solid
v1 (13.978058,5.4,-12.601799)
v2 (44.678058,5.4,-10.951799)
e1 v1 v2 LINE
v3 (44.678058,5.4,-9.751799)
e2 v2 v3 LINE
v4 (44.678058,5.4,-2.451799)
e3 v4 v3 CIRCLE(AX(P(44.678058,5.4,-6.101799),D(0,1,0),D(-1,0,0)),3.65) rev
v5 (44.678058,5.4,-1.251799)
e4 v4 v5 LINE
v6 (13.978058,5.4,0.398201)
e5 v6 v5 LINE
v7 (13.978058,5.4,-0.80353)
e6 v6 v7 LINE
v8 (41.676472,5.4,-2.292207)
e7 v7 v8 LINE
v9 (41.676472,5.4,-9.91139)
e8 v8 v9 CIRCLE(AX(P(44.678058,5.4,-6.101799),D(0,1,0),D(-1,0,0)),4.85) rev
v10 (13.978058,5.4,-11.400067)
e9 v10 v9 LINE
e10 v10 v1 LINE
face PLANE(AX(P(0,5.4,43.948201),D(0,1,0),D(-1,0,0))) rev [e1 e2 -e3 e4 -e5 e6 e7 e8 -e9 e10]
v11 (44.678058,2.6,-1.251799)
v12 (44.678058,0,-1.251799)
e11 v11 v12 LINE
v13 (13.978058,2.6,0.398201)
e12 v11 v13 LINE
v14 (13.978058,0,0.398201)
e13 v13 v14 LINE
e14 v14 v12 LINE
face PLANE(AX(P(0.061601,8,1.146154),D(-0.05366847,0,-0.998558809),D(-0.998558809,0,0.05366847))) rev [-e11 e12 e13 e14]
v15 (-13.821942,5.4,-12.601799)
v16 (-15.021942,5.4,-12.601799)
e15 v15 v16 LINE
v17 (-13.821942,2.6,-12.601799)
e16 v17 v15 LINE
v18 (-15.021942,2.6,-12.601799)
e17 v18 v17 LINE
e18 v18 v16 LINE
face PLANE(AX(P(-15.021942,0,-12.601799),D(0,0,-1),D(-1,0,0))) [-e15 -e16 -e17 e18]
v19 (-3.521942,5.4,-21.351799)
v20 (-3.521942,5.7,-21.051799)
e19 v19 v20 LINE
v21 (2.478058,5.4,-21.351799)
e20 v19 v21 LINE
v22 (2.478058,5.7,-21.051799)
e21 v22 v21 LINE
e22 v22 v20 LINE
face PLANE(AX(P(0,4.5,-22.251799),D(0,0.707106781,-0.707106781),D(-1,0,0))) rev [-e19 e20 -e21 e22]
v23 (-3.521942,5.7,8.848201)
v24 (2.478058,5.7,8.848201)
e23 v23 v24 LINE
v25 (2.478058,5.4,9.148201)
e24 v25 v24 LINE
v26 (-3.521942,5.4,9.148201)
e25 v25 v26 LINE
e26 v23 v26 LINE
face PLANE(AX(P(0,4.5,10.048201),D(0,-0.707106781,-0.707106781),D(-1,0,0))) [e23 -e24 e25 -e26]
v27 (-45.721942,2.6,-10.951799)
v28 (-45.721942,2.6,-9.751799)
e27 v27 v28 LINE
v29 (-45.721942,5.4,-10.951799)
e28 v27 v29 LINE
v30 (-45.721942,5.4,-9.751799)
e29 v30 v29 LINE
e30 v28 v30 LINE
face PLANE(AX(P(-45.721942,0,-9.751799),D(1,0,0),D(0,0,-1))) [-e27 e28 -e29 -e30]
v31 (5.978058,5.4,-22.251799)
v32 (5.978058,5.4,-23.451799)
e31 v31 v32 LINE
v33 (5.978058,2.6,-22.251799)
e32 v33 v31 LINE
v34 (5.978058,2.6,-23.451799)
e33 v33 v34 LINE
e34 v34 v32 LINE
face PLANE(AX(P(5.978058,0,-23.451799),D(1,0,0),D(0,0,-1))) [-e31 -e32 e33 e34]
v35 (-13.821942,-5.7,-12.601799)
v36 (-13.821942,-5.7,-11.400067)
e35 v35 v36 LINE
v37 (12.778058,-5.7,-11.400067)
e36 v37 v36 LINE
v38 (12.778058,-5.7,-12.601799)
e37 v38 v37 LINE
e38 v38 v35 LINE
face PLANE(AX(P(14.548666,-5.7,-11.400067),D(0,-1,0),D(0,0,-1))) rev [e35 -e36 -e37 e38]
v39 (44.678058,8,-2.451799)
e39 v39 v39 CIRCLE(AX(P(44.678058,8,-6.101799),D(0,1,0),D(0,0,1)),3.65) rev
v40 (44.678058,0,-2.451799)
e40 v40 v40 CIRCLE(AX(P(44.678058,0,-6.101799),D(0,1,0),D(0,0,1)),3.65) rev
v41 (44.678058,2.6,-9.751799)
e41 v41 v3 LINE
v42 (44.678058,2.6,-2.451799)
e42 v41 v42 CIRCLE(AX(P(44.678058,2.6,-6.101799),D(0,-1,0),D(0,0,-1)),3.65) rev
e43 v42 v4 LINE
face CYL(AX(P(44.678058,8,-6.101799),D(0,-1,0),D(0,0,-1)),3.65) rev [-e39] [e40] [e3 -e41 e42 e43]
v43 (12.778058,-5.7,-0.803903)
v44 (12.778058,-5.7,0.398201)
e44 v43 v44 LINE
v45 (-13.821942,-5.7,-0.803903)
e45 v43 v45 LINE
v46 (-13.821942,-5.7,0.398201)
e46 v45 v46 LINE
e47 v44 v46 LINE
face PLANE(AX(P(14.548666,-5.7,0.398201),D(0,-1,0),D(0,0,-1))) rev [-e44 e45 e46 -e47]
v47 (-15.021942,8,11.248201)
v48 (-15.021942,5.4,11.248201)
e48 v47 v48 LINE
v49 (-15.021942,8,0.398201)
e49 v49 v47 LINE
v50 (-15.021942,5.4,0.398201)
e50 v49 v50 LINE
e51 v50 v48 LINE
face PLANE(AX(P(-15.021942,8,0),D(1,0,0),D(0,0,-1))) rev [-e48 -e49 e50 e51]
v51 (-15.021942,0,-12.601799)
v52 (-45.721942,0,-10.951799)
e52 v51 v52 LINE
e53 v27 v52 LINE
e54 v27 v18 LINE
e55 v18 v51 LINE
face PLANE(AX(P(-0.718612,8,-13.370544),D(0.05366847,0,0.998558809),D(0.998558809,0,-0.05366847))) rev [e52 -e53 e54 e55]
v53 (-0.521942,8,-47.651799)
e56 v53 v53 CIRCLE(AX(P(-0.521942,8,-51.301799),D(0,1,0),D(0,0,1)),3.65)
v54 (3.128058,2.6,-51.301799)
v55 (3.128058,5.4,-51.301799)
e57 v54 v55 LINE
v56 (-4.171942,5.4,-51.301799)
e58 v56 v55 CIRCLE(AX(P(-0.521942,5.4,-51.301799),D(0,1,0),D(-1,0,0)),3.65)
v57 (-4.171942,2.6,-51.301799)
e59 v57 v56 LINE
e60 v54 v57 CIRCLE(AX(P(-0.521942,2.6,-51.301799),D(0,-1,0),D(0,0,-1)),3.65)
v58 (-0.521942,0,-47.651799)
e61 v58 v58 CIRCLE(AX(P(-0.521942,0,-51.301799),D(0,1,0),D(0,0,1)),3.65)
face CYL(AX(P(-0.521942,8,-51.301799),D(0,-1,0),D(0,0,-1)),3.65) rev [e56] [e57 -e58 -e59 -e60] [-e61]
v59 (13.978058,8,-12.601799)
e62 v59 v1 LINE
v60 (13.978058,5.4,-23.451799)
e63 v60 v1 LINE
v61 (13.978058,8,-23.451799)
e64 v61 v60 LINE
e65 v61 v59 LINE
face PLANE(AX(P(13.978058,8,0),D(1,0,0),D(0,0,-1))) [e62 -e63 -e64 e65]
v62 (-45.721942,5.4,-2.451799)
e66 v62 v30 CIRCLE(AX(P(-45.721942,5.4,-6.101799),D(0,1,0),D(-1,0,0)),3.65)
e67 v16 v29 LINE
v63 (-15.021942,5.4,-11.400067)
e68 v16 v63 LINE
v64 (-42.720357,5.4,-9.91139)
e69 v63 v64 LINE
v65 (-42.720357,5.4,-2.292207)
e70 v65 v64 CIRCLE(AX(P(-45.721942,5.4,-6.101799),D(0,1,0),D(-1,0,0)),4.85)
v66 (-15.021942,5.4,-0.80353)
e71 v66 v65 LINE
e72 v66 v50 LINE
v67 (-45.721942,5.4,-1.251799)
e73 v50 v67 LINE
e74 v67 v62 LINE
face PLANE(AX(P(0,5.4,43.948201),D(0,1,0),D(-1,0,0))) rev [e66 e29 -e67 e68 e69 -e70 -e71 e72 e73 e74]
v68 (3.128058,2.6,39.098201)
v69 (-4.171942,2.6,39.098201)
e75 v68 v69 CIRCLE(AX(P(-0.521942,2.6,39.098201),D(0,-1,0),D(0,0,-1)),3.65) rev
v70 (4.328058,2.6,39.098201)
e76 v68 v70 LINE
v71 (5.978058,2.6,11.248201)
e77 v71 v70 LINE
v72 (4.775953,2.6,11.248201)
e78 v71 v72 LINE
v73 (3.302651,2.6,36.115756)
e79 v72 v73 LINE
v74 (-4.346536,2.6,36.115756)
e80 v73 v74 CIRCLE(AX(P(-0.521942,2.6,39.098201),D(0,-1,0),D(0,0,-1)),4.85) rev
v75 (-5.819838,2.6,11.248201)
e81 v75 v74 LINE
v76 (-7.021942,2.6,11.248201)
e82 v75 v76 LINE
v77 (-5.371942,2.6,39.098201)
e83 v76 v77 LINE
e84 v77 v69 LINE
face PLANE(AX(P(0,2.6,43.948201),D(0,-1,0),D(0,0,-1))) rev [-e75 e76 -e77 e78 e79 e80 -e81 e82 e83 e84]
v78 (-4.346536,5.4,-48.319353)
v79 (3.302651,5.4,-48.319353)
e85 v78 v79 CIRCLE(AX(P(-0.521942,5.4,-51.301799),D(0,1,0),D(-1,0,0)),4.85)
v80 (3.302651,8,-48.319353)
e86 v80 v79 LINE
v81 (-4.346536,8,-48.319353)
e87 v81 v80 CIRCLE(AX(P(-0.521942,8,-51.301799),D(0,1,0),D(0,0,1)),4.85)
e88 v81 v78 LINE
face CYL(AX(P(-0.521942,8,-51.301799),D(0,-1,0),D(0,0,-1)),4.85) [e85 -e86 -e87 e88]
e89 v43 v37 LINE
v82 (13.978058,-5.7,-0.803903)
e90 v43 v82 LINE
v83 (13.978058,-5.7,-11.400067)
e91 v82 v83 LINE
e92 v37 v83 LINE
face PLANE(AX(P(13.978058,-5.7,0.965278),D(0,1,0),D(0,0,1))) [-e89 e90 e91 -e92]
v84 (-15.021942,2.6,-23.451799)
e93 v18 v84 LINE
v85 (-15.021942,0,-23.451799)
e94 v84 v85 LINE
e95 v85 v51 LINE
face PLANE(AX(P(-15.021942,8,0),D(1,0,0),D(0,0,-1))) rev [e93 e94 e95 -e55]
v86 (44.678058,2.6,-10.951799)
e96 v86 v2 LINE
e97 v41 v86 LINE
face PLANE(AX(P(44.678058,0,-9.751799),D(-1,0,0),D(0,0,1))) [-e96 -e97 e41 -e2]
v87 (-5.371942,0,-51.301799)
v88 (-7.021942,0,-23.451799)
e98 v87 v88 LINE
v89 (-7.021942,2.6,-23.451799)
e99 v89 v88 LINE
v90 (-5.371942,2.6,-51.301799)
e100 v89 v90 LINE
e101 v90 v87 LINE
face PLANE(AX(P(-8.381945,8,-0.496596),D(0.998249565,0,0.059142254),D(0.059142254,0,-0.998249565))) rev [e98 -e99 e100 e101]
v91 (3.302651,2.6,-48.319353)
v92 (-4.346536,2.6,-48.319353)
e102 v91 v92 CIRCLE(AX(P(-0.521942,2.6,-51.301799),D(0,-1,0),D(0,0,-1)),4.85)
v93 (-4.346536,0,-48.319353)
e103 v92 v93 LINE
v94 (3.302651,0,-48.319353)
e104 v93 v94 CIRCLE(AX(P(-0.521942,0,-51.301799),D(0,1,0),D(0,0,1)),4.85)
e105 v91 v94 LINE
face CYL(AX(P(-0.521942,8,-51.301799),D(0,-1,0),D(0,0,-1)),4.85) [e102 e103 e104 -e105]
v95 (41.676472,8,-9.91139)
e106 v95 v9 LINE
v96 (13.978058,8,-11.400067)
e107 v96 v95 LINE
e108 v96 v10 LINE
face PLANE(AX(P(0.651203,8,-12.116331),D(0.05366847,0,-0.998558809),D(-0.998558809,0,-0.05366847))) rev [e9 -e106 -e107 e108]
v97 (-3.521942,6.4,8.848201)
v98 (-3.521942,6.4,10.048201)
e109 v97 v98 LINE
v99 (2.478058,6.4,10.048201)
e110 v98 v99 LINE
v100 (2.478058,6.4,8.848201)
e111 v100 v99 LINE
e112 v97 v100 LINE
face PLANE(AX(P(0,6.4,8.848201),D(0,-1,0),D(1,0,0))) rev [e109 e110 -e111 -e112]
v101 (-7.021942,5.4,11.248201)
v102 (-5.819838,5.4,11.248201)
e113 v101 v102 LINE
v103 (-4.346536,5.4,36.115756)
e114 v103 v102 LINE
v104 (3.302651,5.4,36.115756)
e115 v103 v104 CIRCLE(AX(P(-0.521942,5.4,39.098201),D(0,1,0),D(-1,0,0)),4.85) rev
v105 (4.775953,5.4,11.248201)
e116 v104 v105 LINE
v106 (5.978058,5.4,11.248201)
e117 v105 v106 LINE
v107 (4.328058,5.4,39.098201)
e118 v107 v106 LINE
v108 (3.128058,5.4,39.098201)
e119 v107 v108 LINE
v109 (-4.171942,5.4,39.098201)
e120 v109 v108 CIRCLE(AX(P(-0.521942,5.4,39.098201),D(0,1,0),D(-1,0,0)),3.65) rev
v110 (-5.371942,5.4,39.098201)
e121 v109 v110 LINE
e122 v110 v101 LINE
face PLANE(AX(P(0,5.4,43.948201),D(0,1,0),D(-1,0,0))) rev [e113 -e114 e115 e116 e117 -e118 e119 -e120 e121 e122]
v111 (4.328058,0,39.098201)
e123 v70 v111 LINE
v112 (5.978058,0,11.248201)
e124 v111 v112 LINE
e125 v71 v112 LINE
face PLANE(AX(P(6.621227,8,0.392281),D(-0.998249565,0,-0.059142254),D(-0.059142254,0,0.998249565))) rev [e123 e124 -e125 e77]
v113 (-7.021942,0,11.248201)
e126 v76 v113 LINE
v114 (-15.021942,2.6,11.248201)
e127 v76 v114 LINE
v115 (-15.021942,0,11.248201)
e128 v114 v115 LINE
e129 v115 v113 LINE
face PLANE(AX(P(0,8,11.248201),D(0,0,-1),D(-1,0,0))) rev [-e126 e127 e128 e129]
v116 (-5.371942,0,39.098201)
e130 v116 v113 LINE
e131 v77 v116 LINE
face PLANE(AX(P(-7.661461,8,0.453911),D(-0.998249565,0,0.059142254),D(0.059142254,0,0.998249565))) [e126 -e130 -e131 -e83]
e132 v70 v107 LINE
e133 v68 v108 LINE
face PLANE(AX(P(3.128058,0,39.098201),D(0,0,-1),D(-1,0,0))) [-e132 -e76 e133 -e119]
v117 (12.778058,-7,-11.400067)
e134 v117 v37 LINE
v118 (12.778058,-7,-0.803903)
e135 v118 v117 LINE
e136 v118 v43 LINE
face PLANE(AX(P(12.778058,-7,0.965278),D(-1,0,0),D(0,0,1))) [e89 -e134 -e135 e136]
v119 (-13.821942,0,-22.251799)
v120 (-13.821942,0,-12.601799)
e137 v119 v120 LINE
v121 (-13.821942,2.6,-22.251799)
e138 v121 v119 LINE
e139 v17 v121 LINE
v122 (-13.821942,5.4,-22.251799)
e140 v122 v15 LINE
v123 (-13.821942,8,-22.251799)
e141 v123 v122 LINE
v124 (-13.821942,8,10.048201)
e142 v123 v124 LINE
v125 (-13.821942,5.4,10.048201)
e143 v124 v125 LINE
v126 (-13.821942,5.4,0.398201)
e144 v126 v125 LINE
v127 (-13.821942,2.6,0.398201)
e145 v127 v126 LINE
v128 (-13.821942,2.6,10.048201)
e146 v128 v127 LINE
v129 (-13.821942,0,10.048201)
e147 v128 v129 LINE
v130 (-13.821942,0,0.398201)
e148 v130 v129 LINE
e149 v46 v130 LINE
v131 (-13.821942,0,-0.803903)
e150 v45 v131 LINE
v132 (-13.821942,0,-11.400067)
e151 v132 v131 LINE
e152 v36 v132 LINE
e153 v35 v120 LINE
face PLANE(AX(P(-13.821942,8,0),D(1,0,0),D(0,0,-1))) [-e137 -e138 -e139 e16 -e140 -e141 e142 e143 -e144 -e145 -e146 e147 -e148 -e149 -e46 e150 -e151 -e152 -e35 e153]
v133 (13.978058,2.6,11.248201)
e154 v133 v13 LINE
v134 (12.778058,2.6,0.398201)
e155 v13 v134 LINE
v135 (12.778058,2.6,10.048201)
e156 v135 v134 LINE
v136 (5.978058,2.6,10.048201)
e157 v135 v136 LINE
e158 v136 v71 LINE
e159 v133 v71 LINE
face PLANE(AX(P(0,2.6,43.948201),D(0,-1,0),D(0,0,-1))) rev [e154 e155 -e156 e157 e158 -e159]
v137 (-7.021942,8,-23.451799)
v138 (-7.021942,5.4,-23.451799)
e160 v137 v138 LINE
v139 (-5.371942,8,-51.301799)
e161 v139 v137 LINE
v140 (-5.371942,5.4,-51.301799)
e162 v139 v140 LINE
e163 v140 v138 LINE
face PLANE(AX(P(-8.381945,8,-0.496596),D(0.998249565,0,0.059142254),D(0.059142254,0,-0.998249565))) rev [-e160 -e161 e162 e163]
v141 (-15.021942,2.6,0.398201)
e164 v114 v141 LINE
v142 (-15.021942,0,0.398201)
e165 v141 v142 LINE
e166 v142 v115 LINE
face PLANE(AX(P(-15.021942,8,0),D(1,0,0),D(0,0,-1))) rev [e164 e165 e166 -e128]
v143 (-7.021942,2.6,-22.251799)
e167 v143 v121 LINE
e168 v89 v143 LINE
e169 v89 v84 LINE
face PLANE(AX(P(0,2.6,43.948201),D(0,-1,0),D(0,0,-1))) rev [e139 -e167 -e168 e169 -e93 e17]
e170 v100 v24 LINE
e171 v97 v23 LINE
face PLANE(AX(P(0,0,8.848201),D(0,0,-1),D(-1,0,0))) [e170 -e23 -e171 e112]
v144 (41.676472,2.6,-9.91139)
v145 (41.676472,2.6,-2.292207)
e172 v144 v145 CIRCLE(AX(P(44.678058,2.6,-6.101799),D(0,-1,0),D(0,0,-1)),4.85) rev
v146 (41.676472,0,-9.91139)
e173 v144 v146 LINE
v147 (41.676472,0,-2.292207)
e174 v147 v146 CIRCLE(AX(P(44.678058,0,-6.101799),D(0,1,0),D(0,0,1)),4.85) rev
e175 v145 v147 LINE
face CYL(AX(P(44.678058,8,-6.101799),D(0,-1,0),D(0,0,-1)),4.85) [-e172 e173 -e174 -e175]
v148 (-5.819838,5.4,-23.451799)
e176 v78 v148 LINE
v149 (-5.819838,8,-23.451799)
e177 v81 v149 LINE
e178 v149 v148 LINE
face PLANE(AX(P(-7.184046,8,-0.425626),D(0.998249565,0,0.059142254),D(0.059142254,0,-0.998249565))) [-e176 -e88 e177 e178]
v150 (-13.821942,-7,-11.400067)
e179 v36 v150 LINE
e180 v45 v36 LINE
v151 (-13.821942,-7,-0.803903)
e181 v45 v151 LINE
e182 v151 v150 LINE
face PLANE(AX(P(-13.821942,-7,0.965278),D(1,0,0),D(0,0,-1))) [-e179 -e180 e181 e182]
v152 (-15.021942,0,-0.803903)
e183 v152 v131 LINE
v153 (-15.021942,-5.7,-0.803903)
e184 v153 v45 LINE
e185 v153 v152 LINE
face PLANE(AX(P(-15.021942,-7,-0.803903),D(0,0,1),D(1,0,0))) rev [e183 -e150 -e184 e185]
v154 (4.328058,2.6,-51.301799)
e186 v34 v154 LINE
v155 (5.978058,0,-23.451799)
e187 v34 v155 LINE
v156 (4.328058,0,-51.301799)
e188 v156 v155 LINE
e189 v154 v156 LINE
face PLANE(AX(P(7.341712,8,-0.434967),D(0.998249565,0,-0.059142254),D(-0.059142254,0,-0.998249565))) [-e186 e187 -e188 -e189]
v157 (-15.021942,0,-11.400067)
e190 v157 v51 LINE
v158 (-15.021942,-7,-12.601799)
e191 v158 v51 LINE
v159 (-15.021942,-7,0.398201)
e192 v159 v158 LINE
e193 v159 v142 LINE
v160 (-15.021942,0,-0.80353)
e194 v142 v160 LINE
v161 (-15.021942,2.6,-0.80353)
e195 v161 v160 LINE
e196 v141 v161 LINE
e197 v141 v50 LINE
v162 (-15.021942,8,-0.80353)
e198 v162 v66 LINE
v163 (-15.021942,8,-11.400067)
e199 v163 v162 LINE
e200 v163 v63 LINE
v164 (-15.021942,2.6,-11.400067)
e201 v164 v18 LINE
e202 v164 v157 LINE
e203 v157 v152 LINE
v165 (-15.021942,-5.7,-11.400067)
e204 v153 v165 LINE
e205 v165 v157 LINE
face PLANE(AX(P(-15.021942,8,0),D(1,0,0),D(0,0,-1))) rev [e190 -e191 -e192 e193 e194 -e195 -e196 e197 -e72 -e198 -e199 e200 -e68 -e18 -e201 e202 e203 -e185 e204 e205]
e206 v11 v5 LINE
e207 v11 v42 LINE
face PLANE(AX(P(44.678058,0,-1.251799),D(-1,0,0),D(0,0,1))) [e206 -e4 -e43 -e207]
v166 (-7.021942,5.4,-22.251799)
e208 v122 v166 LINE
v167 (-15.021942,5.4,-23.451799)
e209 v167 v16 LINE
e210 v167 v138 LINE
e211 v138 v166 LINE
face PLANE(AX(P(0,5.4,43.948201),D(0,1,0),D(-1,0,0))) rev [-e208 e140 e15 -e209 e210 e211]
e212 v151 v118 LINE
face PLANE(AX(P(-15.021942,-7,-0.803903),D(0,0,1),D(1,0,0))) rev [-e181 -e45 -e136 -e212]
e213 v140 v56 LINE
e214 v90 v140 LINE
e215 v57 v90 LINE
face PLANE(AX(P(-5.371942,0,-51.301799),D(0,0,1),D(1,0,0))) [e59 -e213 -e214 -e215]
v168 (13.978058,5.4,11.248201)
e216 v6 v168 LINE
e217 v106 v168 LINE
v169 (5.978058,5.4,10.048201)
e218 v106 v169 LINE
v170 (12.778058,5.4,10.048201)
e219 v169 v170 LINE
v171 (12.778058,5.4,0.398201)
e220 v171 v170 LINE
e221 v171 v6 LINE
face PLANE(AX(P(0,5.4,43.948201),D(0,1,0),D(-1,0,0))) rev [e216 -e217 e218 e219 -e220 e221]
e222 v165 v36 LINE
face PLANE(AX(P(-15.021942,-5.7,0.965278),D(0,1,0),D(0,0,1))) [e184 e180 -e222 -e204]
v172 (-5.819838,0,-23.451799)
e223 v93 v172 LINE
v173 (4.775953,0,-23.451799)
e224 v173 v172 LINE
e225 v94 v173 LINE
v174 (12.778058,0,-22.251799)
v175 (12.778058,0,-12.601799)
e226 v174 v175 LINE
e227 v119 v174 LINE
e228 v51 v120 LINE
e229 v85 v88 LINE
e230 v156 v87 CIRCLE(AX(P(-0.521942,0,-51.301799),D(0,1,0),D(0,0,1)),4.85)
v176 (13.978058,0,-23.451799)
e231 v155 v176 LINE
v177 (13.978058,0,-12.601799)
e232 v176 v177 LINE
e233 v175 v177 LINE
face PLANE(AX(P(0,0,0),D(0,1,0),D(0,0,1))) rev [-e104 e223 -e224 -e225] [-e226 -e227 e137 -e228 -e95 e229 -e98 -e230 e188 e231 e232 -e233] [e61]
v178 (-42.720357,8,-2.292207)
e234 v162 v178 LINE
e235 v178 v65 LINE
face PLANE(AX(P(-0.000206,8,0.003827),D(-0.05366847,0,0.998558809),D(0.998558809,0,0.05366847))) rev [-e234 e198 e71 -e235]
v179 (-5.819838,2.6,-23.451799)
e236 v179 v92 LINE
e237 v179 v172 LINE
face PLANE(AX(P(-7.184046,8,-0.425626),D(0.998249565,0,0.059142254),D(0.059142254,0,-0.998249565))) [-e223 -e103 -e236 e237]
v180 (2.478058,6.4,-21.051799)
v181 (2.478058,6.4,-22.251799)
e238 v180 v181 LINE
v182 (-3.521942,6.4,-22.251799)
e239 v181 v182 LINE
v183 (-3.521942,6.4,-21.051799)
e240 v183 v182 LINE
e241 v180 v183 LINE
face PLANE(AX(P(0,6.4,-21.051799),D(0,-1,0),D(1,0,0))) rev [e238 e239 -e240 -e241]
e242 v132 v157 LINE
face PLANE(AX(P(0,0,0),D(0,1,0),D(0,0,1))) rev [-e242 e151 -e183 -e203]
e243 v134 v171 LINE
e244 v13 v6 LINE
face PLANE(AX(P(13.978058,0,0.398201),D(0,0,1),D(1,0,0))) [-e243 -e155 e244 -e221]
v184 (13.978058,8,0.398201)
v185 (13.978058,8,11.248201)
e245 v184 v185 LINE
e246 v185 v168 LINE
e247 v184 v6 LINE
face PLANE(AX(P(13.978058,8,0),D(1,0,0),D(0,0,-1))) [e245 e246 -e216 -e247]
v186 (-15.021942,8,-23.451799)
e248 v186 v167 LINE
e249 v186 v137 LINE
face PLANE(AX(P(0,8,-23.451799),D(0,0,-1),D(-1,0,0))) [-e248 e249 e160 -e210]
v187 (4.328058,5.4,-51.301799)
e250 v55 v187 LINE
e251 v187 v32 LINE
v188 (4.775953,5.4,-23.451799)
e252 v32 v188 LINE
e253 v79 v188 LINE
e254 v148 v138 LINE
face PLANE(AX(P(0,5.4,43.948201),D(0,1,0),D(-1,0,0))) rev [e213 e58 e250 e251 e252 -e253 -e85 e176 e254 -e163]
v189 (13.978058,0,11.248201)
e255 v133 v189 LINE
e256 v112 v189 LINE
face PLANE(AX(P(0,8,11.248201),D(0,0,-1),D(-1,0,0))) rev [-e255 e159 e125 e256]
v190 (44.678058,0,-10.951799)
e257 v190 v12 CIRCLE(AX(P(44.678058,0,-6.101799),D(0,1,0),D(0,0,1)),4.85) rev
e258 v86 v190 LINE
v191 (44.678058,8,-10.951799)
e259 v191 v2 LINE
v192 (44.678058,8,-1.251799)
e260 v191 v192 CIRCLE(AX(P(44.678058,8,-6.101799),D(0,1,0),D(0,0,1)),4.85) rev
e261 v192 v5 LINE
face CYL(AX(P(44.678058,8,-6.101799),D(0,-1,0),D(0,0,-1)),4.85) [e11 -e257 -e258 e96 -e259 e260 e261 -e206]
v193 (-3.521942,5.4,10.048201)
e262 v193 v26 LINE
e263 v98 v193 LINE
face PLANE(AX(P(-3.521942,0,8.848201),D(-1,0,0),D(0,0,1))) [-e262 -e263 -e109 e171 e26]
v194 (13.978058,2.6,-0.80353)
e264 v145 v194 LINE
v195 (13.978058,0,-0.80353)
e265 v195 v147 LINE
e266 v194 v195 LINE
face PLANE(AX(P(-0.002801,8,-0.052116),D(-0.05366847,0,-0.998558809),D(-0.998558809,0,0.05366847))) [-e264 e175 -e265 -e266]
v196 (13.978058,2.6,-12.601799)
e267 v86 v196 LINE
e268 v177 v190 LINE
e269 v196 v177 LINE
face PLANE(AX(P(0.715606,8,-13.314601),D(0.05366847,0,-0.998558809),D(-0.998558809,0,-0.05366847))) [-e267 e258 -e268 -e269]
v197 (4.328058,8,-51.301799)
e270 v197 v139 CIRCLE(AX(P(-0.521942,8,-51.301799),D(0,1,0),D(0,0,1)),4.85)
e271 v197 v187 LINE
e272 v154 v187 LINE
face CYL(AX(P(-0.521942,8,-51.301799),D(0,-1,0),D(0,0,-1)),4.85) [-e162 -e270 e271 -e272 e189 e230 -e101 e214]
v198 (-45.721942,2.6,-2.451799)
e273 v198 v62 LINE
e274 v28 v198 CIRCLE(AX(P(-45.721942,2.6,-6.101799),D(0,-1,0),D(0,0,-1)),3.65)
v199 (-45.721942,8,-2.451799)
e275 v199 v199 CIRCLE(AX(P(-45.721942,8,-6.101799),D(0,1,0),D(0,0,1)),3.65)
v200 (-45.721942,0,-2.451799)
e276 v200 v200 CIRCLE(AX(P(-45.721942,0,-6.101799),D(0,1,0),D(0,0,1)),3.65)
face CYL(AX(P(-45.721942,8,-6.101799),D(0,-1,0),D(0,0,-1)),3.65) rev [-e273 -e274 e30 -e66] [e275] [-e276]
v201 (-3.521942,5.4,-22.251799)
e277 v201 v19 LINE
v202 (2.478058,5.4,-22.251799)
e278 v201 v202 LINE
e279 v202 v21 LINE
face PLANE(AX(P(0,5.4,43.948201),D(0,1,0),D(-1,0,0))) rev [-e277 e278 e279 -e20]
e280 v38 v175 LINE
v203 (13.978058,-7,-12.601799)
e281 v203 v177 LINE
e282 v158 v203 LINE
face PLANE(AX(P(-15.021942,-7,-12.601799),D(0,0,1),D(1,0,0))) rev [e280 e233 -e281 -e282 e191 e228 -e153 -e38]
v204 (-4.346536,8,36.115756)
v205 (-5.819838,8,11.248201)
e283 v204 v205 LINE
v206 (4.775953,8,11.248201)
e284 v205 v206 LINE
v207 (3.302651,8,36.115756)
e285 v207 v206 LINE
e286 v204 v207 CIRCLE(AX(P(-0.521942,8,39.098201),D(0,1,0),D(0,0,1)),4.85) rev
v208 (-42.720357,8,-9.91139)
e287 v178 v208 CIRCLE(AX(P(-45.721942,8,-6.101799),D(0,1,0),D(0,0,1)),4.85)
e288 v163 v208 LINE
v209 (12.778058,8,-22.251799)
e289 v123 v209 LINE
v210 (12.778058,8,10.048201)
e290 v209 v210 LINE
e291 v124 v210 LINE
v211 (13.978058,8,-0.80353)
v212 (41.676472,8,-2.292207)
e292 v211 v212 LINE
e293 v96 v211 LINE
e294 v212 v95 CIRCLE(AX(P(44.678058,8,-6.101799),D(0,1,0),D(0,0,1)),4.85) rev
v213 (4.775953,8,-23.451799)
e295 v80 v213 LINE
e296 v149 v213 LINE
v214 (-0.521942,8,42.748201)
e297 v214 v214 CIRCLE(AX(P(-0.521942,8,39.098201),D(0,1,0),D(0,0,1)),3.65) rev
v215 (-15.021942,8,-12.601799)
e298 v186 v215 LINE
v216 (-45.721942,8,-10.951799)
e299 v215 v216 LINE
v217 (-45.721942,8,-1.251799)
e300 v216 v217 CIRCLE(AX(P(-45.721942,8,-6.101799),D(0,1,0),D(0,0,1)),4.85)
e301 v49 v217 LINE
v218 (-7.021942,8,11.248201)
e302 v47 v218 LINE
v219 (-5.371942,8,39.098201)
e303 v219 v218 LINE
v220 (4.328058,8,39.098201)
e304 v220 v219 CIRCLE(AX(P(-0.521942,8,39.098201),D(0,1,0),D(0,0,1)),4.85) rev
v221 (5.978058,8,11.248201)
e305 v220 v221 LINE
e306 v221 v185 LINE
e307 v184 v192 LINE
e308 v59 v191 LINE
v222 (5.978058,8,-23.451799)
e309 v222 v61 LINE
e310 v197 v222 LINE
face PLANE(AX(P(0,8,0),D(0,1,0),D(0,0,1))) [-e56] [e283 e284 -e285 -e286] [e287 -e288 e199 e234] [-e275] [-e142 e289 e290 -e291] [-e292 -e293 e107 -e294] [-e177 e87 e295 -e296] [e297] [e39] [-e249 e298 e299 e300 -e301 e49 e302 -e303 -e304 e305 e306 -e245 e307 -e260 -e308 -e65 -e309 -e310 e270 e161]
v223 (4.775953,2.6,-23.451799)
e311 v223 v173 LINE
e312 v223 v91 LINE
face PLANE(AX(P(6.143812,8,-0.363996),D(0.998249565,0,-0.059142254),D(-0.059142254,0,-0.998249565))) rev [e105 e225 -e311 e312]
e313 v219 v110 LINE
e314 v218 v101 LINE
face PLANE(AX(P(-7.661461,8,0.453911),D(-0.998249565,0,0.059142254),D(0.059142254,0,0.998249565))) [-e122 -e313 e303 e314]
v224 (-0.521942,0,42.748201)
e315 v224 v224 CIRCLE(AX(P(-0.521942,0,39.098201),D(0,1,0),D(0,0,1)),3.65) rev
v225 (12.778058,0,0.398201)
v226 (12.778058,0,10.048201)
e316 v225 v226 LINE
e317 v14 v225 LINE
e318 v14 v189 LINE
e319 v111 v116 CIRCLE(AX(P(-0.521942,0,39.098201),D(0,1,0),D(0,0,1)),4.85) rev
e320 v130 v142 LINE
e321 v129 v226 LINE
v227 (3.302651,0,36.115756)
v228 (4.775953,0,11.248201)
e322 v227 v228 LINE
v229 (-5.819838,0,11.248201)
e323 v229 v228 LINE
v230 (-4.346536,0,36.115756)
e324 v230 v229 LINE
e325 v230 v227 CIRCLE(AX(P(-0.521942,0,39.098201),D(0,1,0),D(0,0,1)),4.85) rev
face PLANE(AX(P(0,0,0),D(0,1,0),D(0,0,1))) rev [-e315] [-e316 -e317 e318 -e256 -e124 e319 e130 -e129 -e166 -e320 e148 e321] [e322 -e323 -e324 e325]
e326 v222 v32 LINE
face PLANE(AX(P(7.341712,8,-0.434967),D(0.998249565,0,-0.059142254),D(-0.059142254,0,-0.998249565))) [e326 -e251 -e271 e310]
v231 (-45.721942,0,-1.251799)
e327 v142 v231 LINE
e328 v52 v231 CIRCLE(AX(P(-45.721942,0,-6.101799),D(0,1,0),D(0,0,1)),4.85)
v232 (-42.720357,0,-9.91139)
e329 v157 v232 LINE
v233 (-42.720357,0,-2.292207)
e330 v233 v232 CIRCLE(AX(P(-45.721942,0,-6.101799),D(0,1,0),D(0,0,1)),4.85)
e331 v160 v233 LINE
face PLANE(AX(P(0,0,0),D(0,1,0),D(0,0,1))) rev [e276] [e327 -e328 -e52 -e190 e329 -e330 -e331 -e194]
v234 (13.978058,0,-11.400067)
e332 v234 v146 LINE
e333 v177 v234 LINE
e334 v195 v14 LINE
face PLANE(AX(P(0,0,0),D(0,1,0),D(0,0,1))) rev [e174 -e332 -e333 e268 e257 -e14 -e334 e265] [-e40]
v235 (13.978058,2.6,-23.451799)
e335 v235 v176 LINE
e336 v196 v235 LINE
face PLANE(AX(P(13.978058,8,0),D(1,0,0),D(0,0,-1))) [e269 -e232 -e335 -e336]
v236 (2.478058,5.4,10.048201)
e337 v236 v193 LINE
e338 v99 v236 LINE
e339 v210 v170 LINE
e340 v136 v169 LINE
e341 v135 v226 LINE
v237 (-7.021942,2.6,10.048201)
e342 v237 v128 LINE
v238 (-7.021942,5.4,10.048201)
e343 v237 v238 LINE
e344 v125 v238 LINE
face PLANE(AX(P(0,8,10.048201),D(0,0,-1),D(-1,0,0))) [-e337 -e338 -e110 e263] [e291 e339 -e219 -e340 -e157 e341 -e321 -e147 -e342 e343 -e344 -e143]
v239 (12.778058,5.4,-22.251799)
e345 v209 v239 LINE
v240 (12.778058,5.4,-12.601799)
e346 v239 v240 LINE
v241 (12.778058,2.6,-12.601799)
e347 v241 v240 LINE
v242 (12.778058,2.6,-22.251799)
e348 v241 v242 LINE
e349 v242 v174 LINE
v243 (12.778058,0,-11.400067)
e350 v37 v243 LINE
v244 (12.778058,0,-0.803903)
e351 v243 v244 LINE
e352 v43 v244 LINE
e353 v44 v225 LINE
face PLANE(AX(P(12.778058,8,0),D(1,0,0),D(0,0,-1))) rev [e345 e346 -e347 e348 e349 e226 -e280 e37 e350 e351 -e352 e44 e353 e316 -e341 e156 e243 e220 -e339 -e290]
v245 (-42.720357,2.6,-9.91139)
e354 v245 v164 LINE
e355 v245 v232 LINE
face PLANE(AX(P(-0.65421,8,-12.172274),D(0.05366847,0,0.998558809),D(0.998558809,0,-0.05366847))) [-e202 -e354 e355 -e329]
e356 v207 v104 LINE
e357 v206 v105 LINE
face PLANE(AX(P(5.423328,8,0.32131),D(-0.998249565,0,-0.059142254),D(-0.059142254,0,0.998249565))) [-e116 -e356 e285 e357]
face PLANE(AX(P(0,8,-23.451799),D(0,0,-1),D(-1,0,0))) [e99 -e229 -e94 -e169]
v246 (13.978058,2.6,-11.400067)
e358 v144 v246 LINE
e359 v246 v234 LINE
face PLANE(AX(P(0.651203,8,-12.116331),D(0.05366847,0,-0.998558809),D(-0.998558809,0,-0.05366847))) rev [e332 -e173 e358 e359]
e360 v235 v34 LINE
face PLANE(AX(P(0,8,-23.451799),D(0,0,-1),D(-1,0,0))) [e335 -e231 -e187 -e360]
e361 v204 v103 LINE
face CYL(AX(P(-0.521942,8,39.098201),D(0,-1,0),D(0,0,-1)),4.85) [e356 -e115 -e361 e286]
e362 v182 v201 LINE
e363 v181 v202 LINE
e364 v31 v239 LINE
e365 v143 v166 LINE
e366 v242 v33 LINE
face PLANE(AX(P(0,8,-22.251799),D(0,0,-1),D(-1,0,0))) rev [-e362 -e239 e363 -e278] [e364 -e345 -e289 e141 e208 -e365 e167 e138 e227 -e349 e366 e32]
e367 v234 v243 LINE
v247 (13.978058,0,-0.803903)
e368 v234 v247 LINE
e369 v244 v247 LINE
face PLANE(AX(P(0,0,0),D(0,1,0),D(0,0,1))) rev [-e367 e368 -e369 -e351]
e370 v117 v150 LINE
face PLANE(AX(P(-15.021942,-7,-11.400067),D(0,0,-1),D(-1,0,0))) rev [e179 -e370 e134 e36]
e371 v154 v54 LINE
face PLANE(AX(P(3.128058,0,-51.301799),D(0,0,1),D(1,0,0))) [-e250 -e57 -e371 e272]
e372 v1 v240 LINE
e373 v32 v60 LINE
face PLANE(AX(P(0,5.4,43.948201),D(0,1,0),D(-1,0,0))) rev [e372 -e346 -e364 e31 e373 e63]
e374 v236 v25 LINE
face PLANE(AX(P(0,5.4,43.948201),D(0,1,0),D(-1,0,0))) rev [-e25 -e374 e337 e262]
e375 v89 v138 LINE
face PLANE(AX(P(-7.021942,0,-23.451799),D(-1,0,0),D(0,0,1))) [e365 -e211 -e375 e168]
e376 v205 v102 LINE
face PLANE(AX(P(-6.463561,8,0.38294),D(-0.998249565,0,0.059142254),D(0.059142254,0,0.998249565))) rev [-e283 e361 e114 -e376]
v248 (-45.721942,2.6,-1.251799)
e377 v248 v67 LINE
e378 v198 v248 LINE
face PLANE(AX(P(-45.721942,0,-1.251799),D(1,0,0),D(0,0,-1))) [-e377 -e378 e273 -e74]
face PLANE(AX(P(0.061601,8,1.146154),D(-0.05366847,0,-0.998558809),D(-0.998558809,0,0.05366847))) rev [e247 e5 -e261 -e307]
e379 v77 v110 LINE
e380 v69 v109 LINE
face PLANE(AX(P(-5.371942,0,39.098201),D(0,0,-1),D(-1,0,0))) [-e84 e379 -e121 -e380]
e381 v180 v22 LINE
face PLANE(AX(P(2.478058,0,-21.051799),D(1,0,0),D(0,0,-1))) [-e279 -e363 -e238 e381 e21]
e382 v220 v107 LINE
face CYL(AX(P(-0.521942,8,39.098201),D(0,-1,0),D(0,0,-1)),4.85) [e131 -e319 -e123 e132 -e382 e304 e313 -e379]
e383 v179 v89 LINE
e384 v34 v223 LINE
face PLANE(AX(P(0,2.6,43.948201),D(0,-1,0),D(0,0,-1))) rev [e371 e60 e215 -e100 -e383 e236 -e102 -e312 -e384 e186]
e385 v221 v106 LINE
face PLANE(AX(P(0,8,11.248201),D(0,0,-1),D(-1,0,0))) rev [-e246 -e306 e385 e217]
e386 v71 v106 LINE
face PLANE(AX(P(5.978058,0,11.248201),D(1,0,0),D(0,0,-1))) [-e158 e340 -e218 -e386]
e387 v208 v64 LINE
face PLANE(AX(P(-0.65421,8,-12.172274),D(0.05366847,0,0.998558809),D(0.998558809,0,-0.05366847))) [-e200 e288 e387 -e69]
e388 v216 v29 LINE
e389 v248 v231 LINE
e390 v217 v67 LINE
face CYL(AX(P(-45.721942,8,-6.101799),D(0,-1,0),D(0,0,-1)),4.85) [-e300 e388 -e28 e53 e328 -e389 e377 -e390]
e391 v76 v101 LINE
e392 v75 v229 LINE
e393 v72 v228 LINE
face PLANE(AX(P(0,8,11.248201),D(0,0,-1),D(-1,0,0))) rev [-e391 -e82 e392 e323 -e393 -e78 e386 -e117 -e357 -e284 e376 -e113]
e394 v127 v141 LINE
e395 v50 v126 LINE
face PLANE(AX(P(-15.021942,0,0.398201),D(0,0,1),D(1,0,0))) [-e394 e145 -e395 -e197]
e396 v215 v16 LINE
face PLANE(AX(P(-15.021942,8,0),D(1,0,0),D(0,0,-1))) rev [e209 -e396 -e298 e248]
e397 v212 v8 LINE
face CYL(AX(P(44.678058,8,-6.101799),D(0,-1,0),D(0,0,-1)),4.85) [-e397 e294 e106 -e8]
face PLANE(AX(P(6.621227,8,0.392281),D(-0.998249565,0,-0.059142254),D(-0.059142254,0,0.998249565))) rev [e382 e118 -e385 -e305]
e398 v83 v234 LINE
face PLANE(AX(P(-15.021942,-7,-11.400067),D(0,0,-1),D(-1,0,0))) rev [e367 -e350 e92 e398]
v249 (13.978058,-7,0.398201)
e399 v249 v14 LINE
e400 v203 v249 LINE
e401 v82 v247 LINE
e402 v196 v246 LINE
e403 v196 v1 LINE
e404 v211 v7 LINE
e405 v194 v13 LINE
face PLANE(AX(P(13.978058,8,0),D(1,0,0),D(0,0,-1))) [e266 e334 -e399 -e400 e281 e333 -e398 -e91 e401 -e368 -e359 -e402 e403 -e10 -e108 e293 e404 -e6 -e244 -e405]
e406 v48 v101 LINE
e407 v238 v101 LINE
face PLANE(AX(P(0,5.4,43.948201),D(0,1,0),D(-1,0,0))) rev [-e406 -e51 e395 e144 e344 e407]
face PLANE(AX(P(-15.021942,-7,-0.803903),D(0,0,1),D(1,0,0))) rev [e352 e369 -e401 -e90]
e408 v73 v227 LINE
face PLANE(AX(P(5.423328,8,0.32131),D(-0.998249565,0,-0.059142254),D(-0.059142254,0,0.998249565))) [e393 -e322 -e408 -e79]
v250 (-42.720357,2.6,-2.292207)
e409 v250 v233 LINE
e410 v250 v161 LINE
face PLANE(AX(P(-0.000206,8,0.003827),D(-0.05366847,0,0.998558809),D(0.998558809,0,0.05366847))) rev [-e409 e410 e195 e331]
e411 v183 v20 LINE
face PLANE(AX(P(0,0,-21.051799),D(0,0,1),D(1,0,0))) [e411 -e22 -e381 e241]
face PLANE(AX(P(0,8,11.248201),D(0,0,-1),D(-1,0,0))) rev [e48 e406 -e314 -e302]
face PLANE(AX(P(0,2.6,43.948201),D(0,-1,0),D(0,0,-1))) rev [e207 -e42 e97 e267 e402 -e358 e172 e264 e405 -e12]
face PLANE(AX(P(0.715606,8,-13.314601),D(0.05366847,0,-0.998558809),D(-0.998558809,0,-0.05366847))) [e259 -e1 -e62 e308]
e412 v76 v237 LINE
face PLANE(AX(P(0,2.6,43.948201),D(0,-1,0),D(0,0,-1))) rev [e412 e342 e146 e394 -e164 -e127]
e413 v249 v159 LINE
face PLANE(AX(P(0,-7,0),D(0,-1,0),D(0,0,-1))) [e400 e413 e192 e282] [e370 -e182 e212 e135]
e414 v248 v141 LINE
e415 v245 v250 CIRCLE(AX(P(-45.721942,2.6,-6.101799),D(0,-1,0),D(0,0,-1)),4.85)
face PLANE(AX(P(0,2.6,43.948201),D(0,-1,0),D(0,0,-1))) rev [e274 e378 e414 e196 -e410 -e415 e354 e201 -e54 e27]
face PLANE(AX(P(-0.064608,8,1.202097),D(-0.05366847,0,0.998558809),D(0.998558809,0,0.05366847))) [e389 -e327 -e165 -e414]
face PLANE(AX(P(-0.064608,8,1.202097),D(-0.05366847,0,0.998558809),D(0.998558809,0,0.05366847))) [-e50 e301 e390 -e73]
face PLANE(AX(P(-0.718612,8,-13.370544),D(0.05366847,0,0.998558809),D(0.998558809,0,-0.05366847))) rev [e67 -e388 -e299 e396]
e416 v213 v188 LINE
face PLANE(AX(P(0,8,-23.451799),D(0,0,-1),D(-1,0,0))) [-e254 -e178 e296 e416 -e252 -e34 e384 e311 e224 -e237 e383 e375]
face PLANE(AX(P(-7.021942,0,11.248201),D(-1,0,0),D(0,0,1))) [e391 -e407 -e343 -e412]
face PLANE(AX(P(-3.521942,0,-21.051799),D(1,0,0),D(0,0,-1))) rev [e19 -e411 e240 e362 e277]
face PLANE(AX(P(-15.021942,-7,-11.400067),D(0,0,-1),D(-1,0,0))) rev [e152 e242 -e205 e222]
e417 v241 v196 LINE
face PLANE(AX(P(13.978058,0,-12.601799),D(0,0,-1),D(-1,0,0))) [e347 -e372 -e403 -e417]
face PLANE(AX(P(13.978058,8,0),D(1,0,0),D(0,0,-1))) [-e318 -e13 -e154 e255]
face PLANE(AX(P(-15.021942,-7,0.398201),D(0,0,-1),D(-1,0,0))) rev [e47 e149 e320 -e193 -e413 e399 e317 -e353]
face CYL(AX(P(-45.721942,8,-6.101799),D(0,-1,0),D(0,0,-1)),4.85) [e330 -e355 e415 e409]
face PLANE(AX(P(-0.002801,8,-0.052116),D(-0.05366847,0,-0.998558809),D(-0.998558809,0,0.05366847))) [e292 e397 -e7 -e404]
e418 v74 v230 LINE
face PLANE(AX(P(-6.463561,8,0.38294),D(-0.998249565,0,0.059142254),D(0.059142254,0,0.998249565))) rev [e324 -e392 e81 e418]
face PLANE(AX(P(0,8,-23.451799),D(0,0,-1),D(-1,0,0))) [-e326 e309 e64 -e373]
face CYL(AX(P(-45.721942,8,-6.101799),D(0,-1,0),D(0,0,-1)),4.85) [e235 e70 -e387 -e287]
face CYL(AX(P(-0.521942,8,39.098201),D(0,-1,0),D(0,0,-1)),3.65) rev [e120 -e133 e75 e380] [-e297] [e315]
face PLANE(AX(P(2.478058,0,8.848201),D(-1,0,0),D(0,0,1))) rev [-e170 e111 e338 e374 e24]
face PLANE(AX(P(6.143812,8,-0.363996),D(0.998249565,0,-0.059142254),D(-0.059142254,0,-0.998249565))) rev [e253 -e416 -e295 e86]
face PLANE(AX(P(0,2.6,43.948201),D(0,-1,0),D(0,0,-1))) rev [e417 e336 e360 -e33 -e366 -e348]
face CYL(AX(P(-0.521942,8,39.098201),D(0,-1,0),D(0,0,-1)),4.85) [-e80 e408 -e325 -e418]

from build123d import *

# Parameters (mm, degrees)
SKETCH1_R               = 3.65
SKETCH1_W               = 26.6
SKETCH1_H               = 32.3
BOSS_EXTRUDE1_DEPTH     = 8
SKETCH2_W               = 3
SKETCH2_H               = 0.7
BOSS_EXTRUDE2_DEPTH     = 1.2
SKETCH3_W               = 3
SKETCH3_H               = 0.7
BOSS_EXTRUDE3_DEPTH     = 1.2
CHAMFER1_SIZE           = 1.2
CUT_EXTRUDE1_DEPTH      = 85.642077968
CUT_EXTRUDE1_DEPTH_BACK = 85.642077968
SKETCH4_W               = 48.801078557
SKETCH4_H               = 1.4
SKETCH4_W_2             = 10.59579159
SKETCH4_W_3             = 46.838011079
BOSS_EXTRUDE4_START     = -5.4
SKETCH5_W               = 13
SKETCH5_H               = 1.2
SKETCH5_W_2             = 1.2
SKETCH5_H_2             = 13
BOSS_EXTRUDE4_DEPTH     = 2.8
BOSS_EXTRUDE5_REACH     = 77.99
SKETCH7_W               = 1.2
SKETCH7_H               = 1.202104206
SKETCH7_H_2             = 1.201731925
BOSS_EXTRUDE6_DEPTH     = 7
SKETCH8_W               = 1.202104206
SKETCH8_H               = 1.3
SKETCH8_W_2             = 1.201731925
BOSS_EXTRUDE7_DEPTH     = 26.6
SKETCH9_W               = 1.2
SKETCH9_H               = 1.3
BOSS_EXTRUDE8_DEPTH     = 11.797895795


with BuildPart() as part:
    # Sketch1 → Boss-Extrude1 (new body)
    with BuildSketch(Plane(origin=(0, 0, 0), x_dir=(1, 0, 0), z_dir=(0, 1, 0))):
        with BuildLine():
            Line((-7.021942446, 23.451798561), (-15.021942446, 23.451798561))
            Line((-15.021942446, 23.451798561), (-15.021942446, 12.601798561))
            Line((-15.021942446, 12.601798561), (-45.721942446, 10.951798561))
            ThreePointArc((-45.721942446, 10.951798561), (-50.571942446, 6.101798561), (-45.721942446, 1.251798561))
            Line((-45.721942446, 1.251798561), (-15.021942446, -0.398201439))
            Line((-15.021942446, -0.398201439), (-15.021942446, -11.248201439))
            Line((-15.021942446, -11.248201439), (-7.021942446, -11.248201439))
            Line((-7.021942446, -11.248201439), (-5.371942446, -39.098201439))
            ThreePointArc((-5.371942446, -39.098201439), (-0.521942446, -43.948201439), (4.328057554, -39.098201439))
            Line((4.328057554, -39.098201439), (5.978057554, -11.248201439))
            Line((5.978057554, -11.248201439), (13.978057554, -11.248201439))
            Line((13.978057554, -11.248201439), (13.978057554, -0.398201439))
            Line((13.978057554, -0.398201439), (44.678057554, 1.251798561))
            ThreePointArc((44.678057554, 1.251798561), (49.528057554, 6.101798561), (44.678057554, 10.951798561))
            Line((44.678057554, 10.951798561), (13.978057554, 12.601798561))
            Line((13.978057554, 12.601798561), (13.978057554, 23.451798561))
            Line((13.978057554, 23.451798561), (5.978057554, 23.451798561))
            Line((5.978057554, 23.451798561), (4.328057554, 51.301798561))
            ThreePointArc((4.328057554, 51.301798561), (-0.521942446, 56.151798561), (-5.371942446, 51.301798561))
            Line((-5.371942446, 51.301798561), (-7.021942446, 23.451798561))
        make_face()
        with Locations(Location((-0.521942446, -39.098201439, 0), (0, 0, 270))):
            Circle(SKETCH1_R, mode=Mode.SUBTRACT)
        with BuildLine():
            Line((4.775953349, -11.248201439), (3.302651218, -36.115755579))
            ThreePointArc((3.302651218, -36.115755579), (-0.521942446, -34.248201439), (-4.34653611, -36.115755579))
            Line((-4.34653611, -36.115755579), (-5.819838241, -11.248201439))
            Line((-5.819838241, -11.248201439), (4.775953349, -11.248201439))
        make_face(mode=Mode.SUBTRACT)
        with Locations(Location((-45.721942446, 6.101798561, 0), (0, 0, 270))):
            Circle(SKETCH1_R, mode=Mode.SUBTRACT)
        with BuildLine():
            Line((-42.720356894, 9.911389638), (-15.021942446, 11.400066636))
            Line((-15.021942446, 11.400066636), (-15.021942446, 0.803530486))
            Line((-15.021942446, 0.803530486), (-42.720356894, 2.292207484))
            ThreePointArc((-42.720356894, 2.292207484), (-40.871942446, 6.101798561), (-42.720356894, 9.911389638))
        make_face(mode=Mode.SUBTRACT)
        with Locations((-0.521942446, 6.101798561)):
            Rectangle(SKETCH1_W, SKETCH1_H, mode=Mode.SUBTRACT)
        with BuildLine():
            Line((-5.819838241, 23.451798561), (-4.34653611, 48.319352702))
            ThreePointArc((-4.34653611, 48.319352702), (-0.521942446, 46.451798561), (3.302651218, 48.319352702))
            Line((3.302651218, 48.319352702), (4.775953349, 23.451798561))
            Line((4.775953349, 23.451798561), (-5.819838241, 23.451798561))
        make_face(mode=Mode.SUBTRACT)
        with Locations(Location((-0.521942446, 51.301798561, 0), (0, 0, 270))):
            Circle(SKETCH1_R, mode=Mode.SUBTRACT)
        with BuildLine():
            Line((41.676472002, 2.292207484), (13.978057554, 0.803530486))
            Line((13.978057554, 0.803530486), (13.978057554, 11.400066636))
            Line((13.978057554, 11.400066636), (41.676472002, 9.911389638))
            ThreePointArc((41.676472002, 9.911389638), (39.828057554, 6.101798561), (41.676472002, 2.292207484))
        make_face(mode=Mode.SUBTRACT)
        with Locations(Location((44.678057554, 6.101798561, 0), (0, 0, 270))):
            Circle(SKETCH1_R, mode=Mode.SUBTRACT)
    extrude(amount=BOSS_EXTRUDE1_DEPTH)

    # Sketch2 → Boss-Extrude2 (add)
    with BuildSketch(Plane.XY.offset(-22.251798561)):
        with Locations((-2.021942446, 6.05)):
            Rectangle(SKETCH2_W, SKETCH2_H)
        with Locations((0.978057554, 6.05)):
            Rectangle(SKETCH2_W, SKETCH2_H)
    extrude(amount=BOSS_EXTRUDE2_DEPTH)

    # Sketch3 → Boss-Extrude3 (add)
    with BuildSketch(Plane(origin=(0, 0, 10.048201439), x_dir=(-1, 0, 0), z_dir=(0, 0, -1))):
        with Locations((-0.978057554, 6.05)):
            Rectangle(SKETCH3_W, SKETCH3_H)
        with Locations((2.021942446, 6.05)):
            Rectangle(SKETCH3_W, SKETCH3_H)
    extrude(amount=BOSS_EXTRUDE3_DEPTH)

    # Chamfer1
    chamfer1_edges = [part.edges().sort_by_distance(p)[0] for p in [
        (-0.521942446, 5.7, -22.251798561),
        (-0.521942446, 5.7, 10.048201439),
    ]]
    chamfer(chamfer1_edges, length=CHAMFER1_SIZE - 0.0001)  # a hair under: the kernel refuses the full size

    # Sketch4 → Cut-Extrude1 (cut, two sides: drawn at the far end of the back side and taken through both)
    with BuildSketch(Plane(origin=(0, 0, -23.451798561), x_dir=(-1, 0, 0), z_dir=(0, 0, -1)).offset(-CUT_EXTRUDE1_DEPTH_BACK)):
        with Locations((-29.176492628, 3.3)):
            Rectangle(SKETCH4_W, SKETCH4_H)
        with Locations((-29.176492628, 4.7)):
            Rectangle(SKETCH4_W, SKETCH4_H)
        with Locations((0.521942446, 4.7)):
            Rectangle(SKETCH4_W_2, SKETCH4_H)
        with Locations((0.521942446, 3.3)):
            Rectangle(SKETCH4_W_2, SKETCH4_H)
        with Locations((29.238843781, 3.3)):
            Rectangle(SKETCH4_W_3, SKETCH4_H)
        with Locations((29.238843781, 4.7)):
            Rectangle(SKETCH4_W_3, SKETCH4_H)
    extrude(amount=CUT_EXTRUDE1_DEPTH + CUT_EXTRUDE1_DEPTH_BACK, mode=Mode.SUBTRACT)


with BuildPart() as cut_extrude1_piece_1:
    # of the separate pieces the step leaves, piece 1, a body of its own (cut_extrude1_pieces)
    add(part.part.solids().sort_by_distance((-3.521942446, 6.4, 10.048201439))[0])



with BuildPart() as cut_extrude1_piece_2:
    # of the separate pieces the step leaves, piece 2, a body of its own (cut_extrude1_pieces)
    add(part.part.solids().sort_by_distance((12.778057554, 2.6, 10.048201439))[0])


with BuildPart() as cut_extrude1_piece_1_1:
    add(cut_extrude1_piece_1.part)

    add(cut_extrude1_piece_2.part)  # Boss-Extrude4 merges Cut-Extrude1 piece 2
    # Sketch5 → Boss-Extrude4 (add)
    with BuildSketch(Plane(origin=(0, 8, 0), x_dir=(1, 0, 0), z_dir=(0, 1, 0)).offset(BOSS_EXTRUDE4_START)):
        with Locations((-0.521942446, 22.851798561)):
            Rectangle(SKETCH5_W, SKETCH5_H)
        with Locations((-0.521942446, -10.648201439)):
            Rectangle(SKETCH5_W, SKETCH5_H)
        with Locations((-14.421942446, 6.101798561)):
            Rectangle(SKETCH5_W_2, SKETCH5_H_2)
        with Locations((13.378057554, 6.101798561)):
            Rectangle(SKETCH5_W_2, SKETCH5_H_2)
    extrude(amount=BOSS_EXTRUDE4_DEPTH)

    # Sketch6 → Boss-Extrude5 (add, up to next)
    with BuildSketch(Plane(origin=(0, 8, 0), x_dir=(1, 0, 0), z_dir=(0, 1, 0)), mode=Mode.PRIVATE) as boss_extrude5_sk1:
        with BuildLine():
            Line((-5.371942446, 51.301798561), (-4.171942446, 51.301798561))
            ThreePointArc((-4.171942446, 51.301798561), (-0.521942446, 54.951798561), (3.128057554, 51.301798561))
            Line((3.128057554, 51.301798561), (4.328057554, 51.301798561))
            ThreePointArc((4.328057554, 51.301798561), (-0.521942446, 56.151798561), (-5.371942446, 51.301798561))
        make_face()
    boss_extrude5_tool1 = extrude(boss_extrude5_sk1.sketch, amount=-BOSS_EXTRUDE5_REACH, mode=Mode.PRIVATE) - cut_extrude1_piece_1_1.part
    # Sketch6 → Boss-Extrude5 (add, up to next)
    with BuildSketch(Plane(origin=(0, 8, 0), x_dir=(1, 0, 0), z_dir=(0, 1, 0)), mode=Mode.PRIVATE) as boss_extrude5_sk2:
        with BuildLine():
            Line((3.128057554, -39.098201439), (4.328057554, -39.098201439))
            ThreePointArc((4.328057554, -39.098201439), (-0.521942446, -43.948201439), (-5.371942446, -39.098201439))
            Line((-5.371942446, -39.098201439), (-4.171942446, -39.098201439))
            ThreePointArc((-4.171942446, -39.098201439), (-0.521942446, -42.748201439), (3.128057554, -39.098201439))
        make_face()
    boss_extrude5_tool2 = extrude(boss_extrude5_sk2.sketch, amount=-BOSS_EXTRUDE5_REACH, mode=Mode.PRIVATE) - cut_extrude1_piece_1_1.part
    # Sketch6 → Boss-Extrude5 (add, up to next)
    with BuildSketch(Plane(origin=(0, 8, 0), x_dir=(1, 0, 0), z_dir=(0, 1, 0)), mode=Mode.PRIVATE) as boss_extrude5_sk3:
        with BuildLine():
            Line((44.678057554, 9.751798561), (44.678057554, 10.951798561))
            ThreePointArc((44.678057554, 10.951798561), (49.528057554, 6.101798561), (44.678057554, 1.251798561))
            Line((44.678057554, 1.251798561), (44.678057554, 2.451798561))
            ThreePointArc((44.678057554, 2.451798561), (48.328057554, 6.101798561), (44.678057554, 9.751798561))
        make_face()
    boss_extrude5_tool3 = extrude(boss_extrude5_sk3.sketch, amount=-BOSS_EXTRUDE5_REACH, mode=Mode.PRIVATE) - cut_extrude1_piece_1_1.part
    # Sketch6 → Boss-Extrude5 (add, up to next)
    with BuildSketch(Plane(origin=(0, 8, 0), x_dir=(1, 0, 0), z_dir=(0, 1, 0)), mode=Mode.PRIVATE) as boss_extrude5_sk4:
        with BuildLine():
            Line((-45.721942446, 1.251798561), (-45.721942446, 2.451798561))
            ThreePointArc((-45.721942446, 2.451798561), (-49.371942446, 6.101798561), (-45.721942446, 9.751798561))
            Line((-45.721942446, 9.751798561), (-45.721942446, 10.951798561))
            ThreePointArc((-45.721942446, 10.951798561), (-50.571942446, 6.101798561), (-45.721942446, 1.251798561))
        make_face()
    boss_extrude5_tool4 = extrude(boss_extrude5_sk4.sketch, amount=-BOSS_EXTRUDE5_REACH, mode=Mode.PRIVATE) - cut_extrude1_piece_1_1.part
    add(boss_extrude5_tool1.solids().sort_by_distance((-4.771942, 8, -51.410248))[0])
    add(boss_extrude5_tool2.solids().sort_by_distance((-0.521942, 8, 43.839752))[0])
    add(boss_extrude5_tool3.solids().sort_by_distance((44.786507, 8, -10.351799))[0])
    add(boss_extrude5_tool4.solids().sort_by_distance((-45.830392, 8, -10.351799))[0])

    # Sketch7 → Boss-Extrude6 (add)
    with BuildSketch(Plane.XZ):
        with Locations((-14.421942446, -0.202850664)):
            Rectangle(SKETCH7_W, SKETCH7_H)
        with Locations((-14.421942446, -12.000932599)):
            Rectangle(SKETCH7_W, SKETCH7_H_2)
        with Locations((13.378057554, -0.202850664)):
            Rectangle(SKETCH7_W, SKETCH7_H)
        with Locations((13.378057554, -12.000932599)):
            Rectangle(SKETCH7_W, SKETCH7_H_2)
    extrude(amount=BOSS_EXTRUDE6_DEPTH)

    # Sketch8 → Boss-Extrude7 (add)
    with BuildSketch(Plane(origin=(-13.821942446, 0, 0), x_dir=(0, 0, -1), z_dir=(1, 0, 0))):
        with Locations((0.202850664, -6.35)):
            Rectangle(SKETCH8_W, SKETCH8_H)
        with Locations((12.000932599, -6.35)):
            Rectangle(SKETCH8_W_2, SKETCH8_H)
    extrude(amount=BOSS_EXTRUDE7_DEPTH)

    # Sketch9 → Boss-Extrude8 (add)
    with BuildSketch(Plane(origin=(0, 0, -12.601798561), x_dir=(-1, 0, 0), z_dir=(0, 0, -1))):
        with Locations((-13.378057554, -6.35)):
            Rectangle(SKETCH9_W, SKETCH9_H)
        with Locations((14.421942446, -6.35)):
            Rectangle(SKETCH9_W, SKETCH9_H)
    extrude(amount=-BOSS_EXTRUDE8_DEPTH)


solid = cut_extrude1_piece_1_1.part
